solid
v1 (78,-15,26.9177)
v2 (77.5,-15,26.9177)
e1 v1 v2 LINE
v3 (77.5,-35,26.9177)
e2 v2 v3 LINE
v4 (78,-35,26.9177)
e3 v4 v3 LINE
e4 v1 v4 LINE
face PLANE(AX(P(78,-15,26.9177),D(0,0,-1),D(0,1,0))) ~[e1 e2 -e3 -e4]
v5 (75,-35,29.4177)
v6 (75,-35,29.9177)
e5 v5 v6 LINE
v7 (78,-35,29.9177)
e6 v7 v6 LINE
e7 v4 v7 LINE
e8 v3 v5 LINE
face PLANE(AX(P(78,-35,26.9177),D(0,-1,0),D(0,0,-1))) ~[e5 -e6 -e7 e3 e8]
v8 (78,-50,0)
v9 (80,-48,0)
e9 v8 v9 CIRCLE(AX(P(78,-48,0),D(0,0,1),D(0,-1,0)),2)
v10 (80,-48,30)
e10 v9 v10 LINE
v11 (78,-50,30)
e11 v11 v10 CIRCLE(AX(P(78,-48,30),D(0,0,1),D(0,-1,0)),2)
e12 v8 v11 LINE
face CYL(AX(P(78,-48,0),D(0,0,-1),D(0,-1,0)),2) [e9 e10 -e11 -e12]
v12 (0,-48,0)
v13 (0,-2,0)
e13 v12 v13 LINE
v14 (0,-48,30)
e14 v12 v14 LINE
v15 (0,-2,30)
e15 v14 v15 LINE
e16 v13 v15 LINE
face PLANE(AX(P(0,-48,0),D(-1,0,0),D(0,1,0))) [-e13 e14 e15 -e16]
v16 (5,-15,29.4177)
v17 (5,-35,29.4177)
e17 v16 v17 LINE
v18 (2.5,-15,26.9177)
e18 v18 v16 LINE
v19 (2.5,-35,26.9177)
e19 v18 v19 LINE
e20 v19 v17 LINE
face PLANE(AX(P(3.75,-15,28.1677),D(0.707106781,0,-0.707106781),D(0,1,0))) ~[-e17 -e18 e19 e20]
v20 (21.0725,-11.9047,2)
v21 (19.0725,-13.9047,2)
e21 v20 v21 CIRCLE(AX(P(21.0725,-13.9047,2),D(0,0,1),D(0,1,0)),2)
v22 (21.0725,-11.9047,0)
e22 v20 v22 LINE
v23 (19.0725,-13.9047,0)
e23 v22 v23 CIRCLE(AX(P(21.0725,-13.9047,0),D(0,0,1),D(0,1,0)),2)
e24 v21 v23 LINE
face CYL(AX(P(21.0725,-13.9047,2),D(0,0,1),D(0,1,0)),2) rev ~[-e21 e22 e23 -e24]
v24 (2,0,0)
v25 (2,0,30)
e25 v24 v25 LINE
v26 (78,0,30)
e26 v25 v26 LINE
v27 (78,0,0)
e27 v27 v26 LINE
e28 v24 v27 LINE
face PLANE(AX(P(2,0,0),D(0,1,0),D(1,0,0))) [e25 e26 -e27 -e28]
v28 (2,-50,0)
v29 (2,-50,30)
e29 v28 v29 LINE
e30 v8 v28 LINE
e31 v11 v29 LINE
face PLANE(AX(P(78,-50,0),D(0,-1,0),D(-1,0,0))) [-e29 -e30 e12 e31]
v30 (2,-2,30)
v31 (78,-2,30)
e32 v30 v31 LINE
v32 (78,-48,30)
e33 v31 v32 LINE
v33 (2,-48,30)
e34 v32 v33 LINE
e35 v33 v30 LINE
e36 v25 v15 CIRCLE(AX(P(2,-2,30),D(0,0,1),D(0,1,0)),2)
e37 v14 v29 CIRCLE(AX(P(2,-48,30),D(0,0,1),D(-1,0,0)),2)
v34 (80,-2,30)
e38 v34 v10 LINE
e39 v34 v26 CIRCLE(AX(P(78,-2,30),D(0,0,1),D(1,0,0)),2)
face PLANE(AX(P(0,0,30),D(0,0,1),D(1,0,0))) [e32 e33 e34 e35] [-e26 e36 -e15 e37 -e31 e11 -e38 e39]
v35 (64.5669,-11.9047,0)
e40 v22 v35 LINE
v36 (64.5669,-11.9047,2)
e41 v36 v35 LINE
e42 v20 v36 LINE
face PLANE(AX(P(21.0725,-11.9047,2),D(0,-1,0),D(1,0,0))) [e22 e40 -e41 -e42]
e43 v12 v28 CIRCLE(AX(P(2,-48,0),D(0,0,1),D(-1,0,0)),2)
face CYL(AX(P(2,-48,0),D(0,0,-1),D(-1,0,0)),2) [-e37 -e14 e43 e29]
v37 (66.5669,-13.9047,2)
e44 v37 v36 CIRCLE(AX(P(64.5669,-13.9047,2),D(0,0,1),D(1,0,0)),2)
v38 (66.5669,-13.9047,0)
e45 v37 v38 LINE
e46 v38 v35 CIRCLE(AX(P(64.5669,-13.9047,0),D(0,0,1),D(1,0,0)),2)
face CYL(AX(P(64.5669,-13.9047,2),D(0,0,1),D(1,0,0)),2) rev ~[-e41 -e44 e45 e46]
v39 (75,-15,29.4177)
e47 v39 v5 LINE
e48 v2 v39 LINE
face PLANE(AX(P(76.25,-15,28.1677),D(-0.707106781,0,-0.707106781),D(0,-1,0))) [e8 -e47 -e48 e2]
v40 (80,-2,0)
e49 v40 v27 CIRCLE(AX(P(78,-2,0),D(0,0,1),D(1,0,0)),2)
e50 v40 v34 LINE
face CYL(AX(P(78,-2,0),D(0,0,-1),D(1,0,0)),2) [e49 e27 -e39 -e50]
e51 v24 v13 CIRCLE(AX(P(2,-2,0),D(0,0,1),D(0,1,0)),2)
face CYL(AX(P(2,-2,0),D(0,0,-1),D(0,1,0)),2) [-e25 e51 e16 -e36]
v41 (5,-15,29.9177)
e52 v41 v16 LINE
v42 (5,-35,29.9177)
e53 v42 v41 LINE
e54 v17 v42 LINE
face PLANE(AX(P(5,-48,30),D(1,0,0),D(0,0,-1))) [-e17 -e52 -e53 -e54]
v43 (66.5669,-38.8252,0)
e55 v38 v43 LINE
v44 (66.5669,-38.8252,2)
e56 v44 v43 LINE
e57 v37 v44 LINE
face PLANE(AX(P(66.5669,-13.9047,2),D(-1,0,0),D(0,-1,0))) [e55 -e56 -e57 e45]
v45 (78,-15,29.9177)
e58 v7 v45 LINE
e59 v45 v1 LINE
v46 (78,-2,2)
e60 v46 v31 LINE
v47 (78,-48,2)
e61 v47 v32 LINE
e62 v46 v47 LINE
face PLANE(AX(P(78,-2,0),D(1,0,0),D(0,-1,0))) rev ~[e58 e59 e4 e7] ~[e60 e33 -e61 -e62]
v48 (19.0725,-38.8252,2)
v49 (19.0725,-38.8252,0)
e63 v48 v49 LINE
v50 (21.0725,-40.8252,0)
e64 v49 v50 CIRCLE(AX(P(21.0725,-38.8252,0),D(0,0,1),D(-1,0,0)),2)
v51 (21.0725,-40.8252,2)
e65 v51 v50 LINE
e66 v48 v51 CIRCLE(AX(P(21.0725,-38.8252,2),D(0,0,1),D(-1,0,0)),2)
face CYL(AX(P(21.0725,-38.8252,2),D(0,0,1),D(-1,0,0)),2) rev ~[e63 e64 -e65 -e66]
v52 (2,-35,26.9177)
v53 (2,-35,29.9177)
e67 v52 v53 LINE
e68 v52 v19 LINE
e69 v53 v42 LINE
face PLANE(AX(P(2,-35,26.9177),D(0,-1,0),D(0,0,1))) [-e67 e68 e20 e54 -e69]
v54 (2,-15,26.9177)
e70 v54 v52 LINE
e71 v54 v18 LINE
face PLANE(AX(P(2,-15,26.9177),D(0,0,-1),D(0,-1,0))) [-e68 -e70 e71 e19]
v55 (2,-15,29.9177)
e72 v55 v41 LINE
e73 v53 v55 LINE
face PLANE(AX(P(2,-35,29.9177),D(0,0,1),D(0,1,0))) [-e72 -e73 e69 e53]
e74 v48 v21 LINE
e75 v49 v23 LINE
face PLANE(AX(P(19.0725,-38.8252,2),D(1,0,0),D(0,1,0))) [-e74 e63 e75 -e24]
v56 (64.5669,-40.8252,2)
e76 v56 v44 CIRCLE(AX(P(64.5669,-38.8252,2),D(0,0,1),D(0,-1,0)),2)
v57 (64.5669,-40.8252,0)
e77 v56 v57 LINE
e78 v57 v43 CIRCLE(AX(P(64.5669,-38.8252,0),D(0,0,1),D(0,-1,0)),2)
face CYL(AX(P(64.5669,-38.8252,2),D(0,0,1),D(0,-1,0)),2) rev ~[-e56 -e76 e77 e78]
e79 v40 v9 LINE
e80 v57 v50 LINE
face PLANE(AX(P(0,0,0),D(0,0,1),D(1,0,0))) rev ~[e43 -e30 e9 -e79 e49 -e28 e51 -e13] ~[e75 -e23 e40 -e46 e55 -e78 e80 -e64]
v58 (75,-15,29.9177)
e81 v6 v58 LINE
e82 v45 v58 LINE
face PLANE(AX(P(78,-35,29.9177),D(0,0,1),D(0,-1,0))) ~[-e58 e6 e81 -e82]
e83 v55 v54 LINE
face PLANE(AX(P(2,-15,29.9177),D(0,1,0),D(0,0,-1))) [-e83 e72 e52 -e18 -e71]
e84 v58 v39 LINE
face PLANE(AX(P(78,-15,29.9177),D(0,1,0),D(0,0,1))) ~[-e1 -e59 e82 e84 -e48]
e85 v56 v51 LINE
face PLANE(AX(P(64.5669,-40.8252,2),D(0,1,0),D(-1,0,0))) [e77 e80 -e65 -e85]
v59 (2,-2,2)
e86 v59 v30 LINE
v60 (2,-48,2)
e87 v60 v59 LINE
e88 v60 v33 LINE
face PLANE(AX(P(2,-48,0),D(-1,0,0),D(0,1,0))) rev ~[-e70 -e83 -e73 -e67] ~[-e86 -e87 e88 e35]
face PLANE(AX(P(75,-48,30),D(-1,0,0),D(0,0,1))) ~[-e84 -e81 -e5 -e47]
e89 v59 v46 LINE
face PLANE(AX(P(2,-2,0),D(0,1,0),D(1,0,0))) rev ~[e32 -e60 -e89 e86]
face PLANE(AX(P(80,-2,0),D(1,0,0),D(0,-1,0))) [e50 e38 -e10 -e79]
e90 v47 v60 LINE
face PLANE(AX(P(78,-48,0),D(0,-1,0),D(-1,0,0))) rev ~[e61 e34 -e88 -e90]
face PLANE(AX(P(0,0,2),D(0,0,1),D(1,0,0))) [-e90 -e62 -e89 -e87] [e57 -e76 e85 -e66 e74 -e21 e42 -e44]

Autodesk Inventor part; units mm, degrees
ref_plane "YZ Plane" through (0, 0, 0) normal (1, 0, 0) x (0, 1, 0)
ref_plane "XZ Plane" through (0, 0, 0) normal (0, 1, 0) x (-1, 0, 0)
sketch "Náčrt3" plane through (0, 0, 0) normal (0, 0, 1) x (1, 0, 0)
  line L0 (2, 0) -> (78, 0)
  line L1 (80, -2) -> (80, -48)
  line L2 (78, -50) -> (2, -50)
  line L3 (0, -48) -> (0, -2)
  arc A0 (2, 0) -> (0, -2) centre (2, -2) ccw
  arc A1 (0, -48) -> (2, -50) centre (2, -48) ccw
  arc A2 (80, -2) -> (78, 0) centre (78, -2) ccw
  arc A3 (78, -50) -> (80, -48) centre (78, -48) ccw
  point P0 (0, 0)
  point P1 (80, -50)
  point P2 (80, 0)
  point P3 (0, -50)
  dimension "d4" = 80
  dimension "d5" = 50
  dimension "d6" = 2
extrude "Vysunutí2" add sketch "Náčrt3" along normal blind 30
shell "Skořepina1" thickness 2 removed faces 1 at (27.3333, -16.6667, 30)
sketch "Náčrt4" plane through (2, -48, 30) normal (1, 0, 0) x (0, 0, -1)
  line L0 (0.0823, 33) -> (3.0823, 33)
  line L1 (3.0823, 33) -> (3.0823, 13)
  line L2 (3.0823, 13) -> (0.0823, 13)
  line L3 (0.0823, 13) -> (0.0823, 33)
  point P0 (30, 48)
  dimension "d10" = 3
  dimension "d11" = 20
  dimension "d12" = 15
extrude "Vysunutí3" add sketch "Náčrt4" along normal blind 3
chamfer "Zkosení1" distance 2.5 angle 45 1 edges at (5, -25, 26.9177)
ref_plane "Pracovní rovina2" through (40, -48, 0) normal (1, 0, 0) x (0, 0, -1)
mirror "Zrcadlit1" about plane through (40, -48, 0) normal (1, 0, 0) of "Vysunutí3", "Zkosení1"
sketch "Náčrt5" plane through (2, -48, 2) normal (0, 0, 1) x (1, 0, 0)
  line L0 (19.0725, 36.0953) -> (62.5669, 36.0953)
  line L1 (64.5669, 34.0953) -> (64.5669, 9.1748)
  line L2 (62.5669, 7.1748) -> (19.0725, 7.1748)
  line L3 (17.0725, 9.1748) -> (17.0725, 34.0953)
  arc A0 (19.0725, 36.0953) -> (17.0725, 34.0953) centre (19.0725, 34.0953) ccw
  arc A1 (17.0725, 9.1748) -> (19.0725, 7.1748) centre (19.0725, 9.1748) ccw
  arc A2 (64.5669, 34.0953) -> (62.5669, 36.0953) centre (62.5669, 34.0953) ccw
  arc A3 (62.5669, 7.1748) -> (64.5669, 9.1748) centre (62.5669, 9.1748) ccw
  point P0 (-2, 48)
  dimension "d19" = 2
extrude "Vysunutí4" cut sketch "Náčrt5" against normal blind 3
properties part number "spodok"
